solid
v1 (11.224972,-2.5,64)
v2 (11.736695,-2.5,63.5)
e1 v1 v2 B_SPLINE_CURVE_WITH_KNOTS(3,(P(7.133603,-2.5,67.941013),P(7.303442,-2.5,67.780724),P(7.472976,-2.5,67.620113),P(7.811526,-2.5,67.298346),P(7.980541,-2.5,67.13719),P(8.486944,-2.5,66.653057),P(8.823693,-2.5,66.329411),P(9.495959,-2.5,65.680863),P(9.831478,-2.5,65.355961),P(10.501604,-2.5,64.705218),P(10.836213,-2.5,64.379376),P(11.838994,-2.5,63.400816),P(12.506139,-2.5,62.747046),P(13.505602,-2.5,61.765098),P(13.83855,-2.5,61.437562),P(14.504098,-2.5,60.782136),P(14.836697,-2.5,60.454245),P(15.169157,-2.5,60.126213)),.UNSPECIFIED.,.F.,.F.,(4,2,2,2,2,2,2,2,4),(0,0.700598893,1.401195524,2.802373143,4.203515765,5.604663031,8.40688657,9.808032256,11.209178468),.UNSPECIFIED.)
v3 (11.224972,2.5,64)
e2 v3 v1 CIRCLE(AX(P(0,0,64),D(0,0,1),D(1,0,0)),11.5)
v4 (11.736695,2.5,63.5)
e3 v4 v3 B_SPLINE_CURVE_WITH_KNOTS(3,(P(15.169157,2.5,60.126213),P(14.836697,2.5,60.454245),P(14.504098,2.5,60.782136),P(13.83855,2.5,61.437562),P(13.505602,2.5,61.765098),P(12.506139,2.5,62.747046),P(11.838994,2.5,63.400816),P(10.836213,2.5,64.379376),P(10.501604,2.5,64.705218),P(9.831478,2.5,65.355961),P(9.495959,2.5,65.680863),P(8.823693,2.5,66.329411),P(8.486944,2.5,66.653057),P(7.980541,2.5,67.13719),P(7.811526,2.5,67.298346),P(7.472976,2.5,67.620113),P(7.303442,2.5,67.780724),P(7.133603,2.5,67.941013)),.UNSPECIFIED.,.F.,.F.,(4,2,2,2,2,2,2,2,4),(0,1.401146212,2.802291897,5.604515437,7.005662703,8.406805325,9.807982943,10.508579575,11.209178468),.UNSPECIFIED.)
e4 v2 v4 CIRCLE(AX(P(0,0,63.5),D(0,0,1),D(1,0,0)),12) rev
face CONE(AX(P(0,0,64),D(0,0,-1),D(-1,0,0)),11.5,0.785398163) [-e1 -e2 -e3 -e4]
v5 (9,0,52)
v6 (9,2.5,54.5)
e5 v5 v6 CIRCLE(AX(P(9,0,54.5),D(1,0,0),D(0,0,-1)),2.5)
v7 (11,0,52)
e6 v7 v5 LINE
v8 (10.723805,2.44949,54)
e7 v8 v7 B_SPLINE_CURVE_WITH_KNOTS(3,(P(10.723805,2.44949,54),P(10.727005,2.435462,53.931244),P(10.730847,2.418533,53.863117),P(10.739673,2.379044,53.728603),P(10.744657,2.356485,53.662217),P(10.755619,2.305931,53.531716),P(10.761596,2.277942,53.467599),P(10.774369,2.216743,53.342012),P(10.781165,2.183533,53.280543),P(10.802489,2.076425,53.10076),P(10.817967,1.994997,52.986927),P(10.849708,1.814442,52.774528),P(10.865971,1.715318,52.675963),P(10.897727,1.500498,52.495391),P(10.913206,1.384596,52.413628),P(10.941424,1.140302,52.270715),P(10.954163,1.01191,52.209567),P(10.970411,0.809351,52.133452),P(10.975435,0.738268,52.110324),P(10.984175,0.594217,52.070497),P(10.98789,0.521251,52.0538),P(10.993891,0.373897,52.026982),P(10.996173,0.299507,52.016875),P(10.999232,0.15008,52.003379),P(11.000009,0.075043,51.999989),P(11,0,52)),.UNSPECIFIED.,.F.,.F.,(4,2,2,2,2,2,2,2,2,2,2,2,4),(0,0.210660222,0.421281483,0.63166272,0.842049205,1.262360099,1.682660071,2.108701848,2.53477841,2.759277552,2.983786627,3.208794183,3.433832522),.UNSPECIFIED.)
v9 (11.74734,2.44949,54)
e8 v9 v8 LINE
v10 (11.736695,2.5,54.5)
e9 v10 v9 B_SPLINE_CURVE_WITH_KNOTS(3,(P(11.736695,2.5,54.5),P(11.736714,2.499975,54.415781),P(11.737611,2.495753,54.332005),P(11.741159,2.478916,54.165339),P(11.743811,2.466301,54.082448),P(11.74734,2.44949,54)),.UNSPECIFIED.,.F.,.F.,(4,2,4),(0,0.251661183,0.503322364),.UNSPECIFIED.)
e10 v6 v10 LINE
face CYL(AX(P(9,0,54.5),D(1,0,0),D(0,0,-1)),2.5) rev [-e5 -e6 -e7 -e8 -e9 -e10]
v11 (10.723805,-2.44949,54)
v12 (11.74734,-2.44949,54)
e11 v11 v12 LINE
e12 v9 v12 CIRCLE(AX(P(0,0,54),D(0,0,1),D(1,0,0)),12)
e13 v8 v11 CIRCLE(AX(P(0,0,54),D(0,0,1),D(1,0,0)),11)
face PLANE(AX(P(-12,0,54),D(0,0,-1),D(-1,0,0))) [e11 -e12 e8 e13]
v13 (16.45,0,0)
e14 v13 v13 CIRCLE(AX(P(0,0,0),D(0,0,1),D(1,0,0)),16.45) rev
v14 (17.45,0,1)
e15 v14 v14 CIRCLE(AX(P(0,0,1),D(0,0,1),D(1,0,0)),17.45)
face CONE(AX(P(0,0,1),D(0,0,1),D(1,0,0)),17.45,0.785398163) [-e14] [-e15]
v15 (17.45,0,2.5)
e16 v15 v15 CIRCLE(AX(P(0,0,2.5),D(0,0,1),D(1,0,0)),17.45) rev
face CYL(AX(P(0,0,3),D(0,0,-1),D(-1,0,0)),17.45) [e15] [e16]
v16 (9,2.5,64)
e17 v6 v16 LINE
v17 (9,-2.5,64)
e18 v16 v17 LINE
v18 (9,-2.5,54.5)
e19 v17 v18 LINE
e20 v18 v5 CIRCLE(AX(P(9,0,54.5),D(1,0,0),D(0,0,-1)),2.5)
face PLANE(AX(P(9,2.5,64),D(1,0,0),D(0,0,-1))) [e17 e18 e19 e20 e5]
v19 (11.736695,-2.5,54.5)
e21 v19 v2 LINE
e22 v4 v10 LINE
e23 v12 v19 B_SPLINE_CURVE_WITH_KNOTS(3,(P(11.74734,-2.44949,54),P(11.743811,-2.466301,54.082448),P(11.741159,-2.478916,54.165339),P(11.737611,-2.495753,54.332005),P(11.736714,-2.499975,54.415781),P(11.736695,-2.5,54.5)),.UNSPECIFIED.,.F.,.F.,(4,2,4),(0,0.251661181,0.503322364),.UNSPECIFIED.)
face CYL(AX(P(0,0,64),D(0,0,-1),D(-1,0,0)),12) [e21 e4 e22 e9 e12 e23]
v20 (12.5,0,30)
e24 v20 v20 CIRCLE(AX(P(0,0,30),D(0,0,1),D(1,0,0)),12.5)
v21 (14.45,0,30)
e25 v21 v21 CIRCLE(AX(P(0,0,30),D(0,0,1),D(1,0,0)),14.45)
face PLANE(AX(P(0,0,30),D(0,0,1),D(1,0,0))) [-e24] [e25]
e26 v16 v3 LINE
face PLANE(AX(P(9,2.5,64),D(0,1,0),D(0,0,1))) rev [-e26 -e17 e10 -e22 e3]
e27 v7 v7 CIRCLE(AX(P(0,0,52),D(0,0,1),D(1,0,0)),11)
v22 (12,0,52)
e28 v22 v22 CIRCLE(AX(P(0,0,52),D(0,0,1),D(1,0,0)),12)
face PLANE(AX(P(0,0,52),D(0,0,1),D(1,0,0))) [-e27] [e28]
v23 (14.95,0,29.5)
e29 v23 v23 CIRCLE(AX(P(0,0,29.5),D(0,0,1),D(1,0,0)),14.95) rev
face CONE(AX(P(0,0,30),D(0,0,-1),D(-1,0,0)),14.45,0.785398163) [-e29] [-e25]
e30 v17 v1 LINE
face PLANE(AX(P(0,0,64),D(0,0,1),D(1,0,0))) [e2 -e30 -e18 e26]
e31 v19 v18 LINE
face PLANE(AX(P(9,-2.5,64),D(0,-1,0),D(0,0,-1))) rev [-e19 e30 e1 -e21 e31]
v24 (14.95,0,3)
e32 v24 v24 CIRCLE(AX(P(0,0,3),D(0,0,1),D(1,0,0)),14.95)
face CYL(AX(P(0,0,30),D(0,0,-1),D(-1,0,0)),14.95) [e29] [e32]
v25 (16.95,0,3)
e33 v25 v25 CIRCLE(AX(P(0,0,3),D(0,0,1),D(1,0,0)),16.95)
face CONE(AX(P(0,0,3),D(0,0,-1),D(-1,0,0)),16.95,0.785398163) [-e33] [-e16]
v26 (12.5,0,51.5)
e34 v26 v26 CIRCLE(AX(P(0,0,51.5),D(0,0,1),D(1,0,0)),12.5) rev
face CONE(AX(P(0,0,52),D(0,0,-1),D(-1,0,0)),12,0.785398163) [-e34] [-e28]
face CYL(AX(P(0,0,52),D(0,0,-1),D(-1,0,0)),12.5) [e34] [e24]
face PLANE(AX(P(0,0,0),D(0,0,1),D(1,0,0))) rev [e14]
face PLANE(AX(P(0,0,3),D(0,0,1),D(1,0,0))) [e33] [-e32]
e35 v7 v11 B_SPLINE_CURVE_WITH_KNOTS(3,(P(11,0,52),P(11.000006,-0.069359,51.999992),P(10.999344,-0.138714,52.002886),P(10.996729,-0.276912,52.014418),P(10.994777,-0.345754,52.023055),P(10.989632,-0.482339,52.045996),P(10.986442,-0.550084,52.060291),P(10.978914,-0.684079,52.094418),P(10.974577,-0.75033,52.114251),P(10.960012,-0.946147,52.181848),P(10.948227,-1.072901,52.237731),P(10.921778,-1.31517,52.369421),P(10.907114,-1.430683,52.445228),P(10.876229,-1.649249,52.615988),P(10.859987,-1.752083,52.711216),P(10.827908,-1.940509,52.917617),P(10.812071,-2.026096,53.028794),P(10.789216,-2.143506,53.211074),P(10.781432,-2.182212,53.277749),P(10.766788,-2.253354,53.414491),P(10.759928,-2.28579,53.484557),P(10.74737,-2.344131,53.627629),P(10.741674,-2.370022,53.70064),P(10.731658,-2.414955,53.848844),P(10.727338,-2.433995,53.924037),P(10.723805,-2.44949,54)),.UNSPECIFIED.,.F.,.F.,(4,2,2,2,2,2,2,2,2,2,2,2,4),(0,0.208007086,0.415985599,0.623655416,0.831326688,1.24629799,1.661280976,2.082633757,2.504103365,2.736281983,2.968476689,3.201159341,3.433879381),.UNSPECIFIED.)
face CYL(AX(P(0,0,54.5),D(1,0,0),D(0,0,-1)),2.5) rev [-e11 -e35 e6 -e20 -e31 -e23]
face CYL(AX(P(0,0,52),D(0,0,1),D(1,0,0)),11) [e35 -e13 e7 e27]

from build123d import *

# Parameters (mm, degrees)
SKETCH_1_R          = 17.45
EXTRUDE_1_DEPTH     = 3
SKETCH_2_R          = 14.95
EXTRUDE_2_DEPTH     = 27
SKETCH_4_R          = 12.5
EXTRUDE_3_DEPTH     = 22
SKETCH_5_R          = 12
EXTRUDE_4_DEPTH     = 12
CHAMFER_1_SIZE      = 0.5
SKETCH_6_W          = 1
SKETCH_6_H          = 2
CHAMFER_2_SIZE      = 0.5
CHAMFER_3_SIZE      = 1
SKETCH_7_W          = 12
SKETCH_7_H          = 5
CUT_EXTRUDE_1_DEPTH = 3
FILLET_1_R          = 2.5


with BuildPart() as part:
    # 草图1 → 拉伸1 (new body)
    with BuildSketch(Plane.XY):
        Circle(SKETCH_1_R)
    extrude(amount=EXTRUDE_1_DEPTH)

    # 草图2 → 拉伸2 (add)
    with BuildSketch(Plane.XY.offset(3)):
        Circle(SKETCH_2_R)
    extrude(amount=EXTRUDE_2_DEPTH)

    # 草图4 → 拉伸3 (add)
    with BuildSketch(Plane.XY.offset(30)):
        Circle(SKETCH_4_R)
    extrude(amount=EXTRUDE_3_DEPTH)

    # 草图5 → 拉伸4 (add)
    with BuildSketch(Plane.XY.offset(52)):
        Circle(SKETCH_5_R)
    extrude(amount=EXTRUDE_4_DEPTH)

    # 倒角1
    chamfer_1_edges = [part.edges().sort_by_distance(p)[0] for p in [
        (-12, 0, 64),
    ]]
    chamfer(chamfer_1_edges, length=CHAMFER_1_SIZE)

    # 草图6 → 切除-旋转1 (revolve, cut)
    with BuildSketch(Plane(origin=(0, 0, 0), x_dir=(1, 0, 0), z_dir=(0, 1, 0)), mode=Mode.PRIVATE) as cut_revolve_1_sk:
        with Locations((-11.5, -53)):
            Rectangle(SKETCH_6_W, SKETCH_6_H)
    revolve(cut_revolve_1_sk.sketch.rotate(Axis((0, 0, 52), (0, 0, -1)), 180), axis=Axis((0, 0, 52), (0, 0, -1)), mode=Mode.SUBTRACT)

    # 倒角2
    chamfer_2_edges = [part.edges().sort_by_distance(p)[0] for p in [
        (-12.5, 0, 52),
        (-17.45, 0, 3),
        (-14.95, 0, 30),
    ]]
    chamfer(chamfer_2_edges, length=CHAMFER_2_SIZE)

    # 倒角3
    chamfer_3_edges = [part.edges().sort_by_distance(p)[0] for p in [
        (-17.45, 0, 0),
    ]]
    chamfer(chamfer_3_edges, length=CHAMFER_3_SIZE)

    # 草图7 → 切除-拉伸1 (cut)
    with BuildSketch(Plane(origin=(12, 0, 0), x_dir=(0, 0, -1), z_dir=(1, 0, 0))):
        with Locations((-58, 0)):
            Rectangle(SKETCH_7_W, SKETCH_7_H)
    extrude(amount=-CUT_EXTRUDE_1_DEPTH, mode=Mode.SUBTRACT)

    # 圆角1
    # the kernel refuses this fillet: 2.5 mm, written as the material it adds along each edge
    with BuildSketch(Plane(origin=(16.962142643, -2.5, 52), x_dir=(0, 1, 0), z_dir=(-1, 0, 0))) as fillet_1_piece_1_section:
        with BuildLine():
            CenterArc((FILLET_1_R, -FILLET_1_R), FILLET_1_R, 90, 90)
            Line((0, -FILLET_1_R), (0, 0))
            Line((0, 0), (FILLET_1_R, 0))
        make_face()
    fillet_1_piece_1 = extrude(amount=14.212142643, mode=Mode.PRIVATE)
    fillet_1_piece_1 = fillet_1_piece_1 & Plane(origin=(0, 0, 54.124758418), x_dir=(1, 0, 0), z_dir=(0, 0, -1)) * Cylinder(12, 39, mode=Mode.PRIVATE)
    fillet_1_piece_1 = split(fillet_1_piece_1, bisect_by=Plane(origin=(11.227777132, -2.484876178, 54), z_dir=(0, 0, 1)), keep=Keep.TOP, mode=Mode.PRIVATE)
    add(fillet_1_piece_1)
    with BuildSketch(Plane(origin=(16.962142643, -2.5, 52), x_dir=(0, 1, 0), z_dir=(-1, 0, 0))) as fillet_1_piece_2_section:
        with BuildLine():
            CenterArc((FILLET_1_R, -FILLET_1_R), FILLET_1_R, 90, 90)
            Line((0, -FILLET_1_R), (0, 0))
            Line((0, 0), (FILLET_1_R, 0))
        make_face()
    fillet_1_piece_2 = extrude(amount=14.212142643, mode=Mode.PRIVATE)
    fillet_1_piece_2 = fillet_1_piece_2 & Plane(origin=(0, 0, 53.528388409), x_dir=(1, 0, 0), z_dir=(0, 0, 1)) * Cylinder(11, 39, mode=Mode.PRIVATE)
    add(fillet_1_piece_2)
    with BuildSketch(Plane(origin=(16.962142643, 2.5, 52), x_dir=(0, -1, 0), z_dir=(-1, 0, 0))) as fillet_1_piece_3_section:
        with BuildLine():
            CenterArc((FILLET_1_R, FILLET_1_R), FILLET_1_R, 180, 90)
            Line((0, FILLET_1_R), (0, 0))
            Line((0, 0), (FILLET_1_R, 0))
        make_face()
    fillet_1_piece_3 = extrude(amount=14.212142643, mode=Mode.PRIVATE)
    fillet_1_piece_3 = fillet_1_piece_3 & Plane(origin=(0, 0, 54.124758418), x_dir=(1, 0, 0), z_dir=(0, 0, -1)) * Cylinder(12, 39, mode=Mode.PRIVATE)
    fillet_1_piece_3 = split(fillet_1_piece_3, bisect_by=Plane(origin=(11.227777136, 2.484876178, 54), z_dir=(0, 0, 1)), keep=Keep.TOP, mode=Mode.PRIVATE)
    add(fillet_1_piece_3)
    with BuildSketch(Plane(origin=(16.962142643, 2.5, 52), x_dir=(0, -1, 0), z_dir=(-1, 0, 0))) as fillet_1_piece_4_section:
        with BuildLine():
            CenterArc((FILLET_1_R, FILLET_1_R), FILLET_1_R, 180, 90)
            Line((0, FILLET_1_R), (0, 0))
            Line((0, 0), (FILLET_1_R, 0))
        make_face()
    fillet_1_piece_4 = extrude(amount=14.212142643, mode=Mode.PRIVATE)
    fillet_1_piece_4 = fillet_1_piece_4 & Plane(origin=(0, 0, 53.5283884), x_dir=(1, 0, 0), z_dir=(0, 0, 1)) * Cylinder(11, 39, mode=Mode.PRIVATE)
    add(fillet_1_piece_4)


solid = part.part
